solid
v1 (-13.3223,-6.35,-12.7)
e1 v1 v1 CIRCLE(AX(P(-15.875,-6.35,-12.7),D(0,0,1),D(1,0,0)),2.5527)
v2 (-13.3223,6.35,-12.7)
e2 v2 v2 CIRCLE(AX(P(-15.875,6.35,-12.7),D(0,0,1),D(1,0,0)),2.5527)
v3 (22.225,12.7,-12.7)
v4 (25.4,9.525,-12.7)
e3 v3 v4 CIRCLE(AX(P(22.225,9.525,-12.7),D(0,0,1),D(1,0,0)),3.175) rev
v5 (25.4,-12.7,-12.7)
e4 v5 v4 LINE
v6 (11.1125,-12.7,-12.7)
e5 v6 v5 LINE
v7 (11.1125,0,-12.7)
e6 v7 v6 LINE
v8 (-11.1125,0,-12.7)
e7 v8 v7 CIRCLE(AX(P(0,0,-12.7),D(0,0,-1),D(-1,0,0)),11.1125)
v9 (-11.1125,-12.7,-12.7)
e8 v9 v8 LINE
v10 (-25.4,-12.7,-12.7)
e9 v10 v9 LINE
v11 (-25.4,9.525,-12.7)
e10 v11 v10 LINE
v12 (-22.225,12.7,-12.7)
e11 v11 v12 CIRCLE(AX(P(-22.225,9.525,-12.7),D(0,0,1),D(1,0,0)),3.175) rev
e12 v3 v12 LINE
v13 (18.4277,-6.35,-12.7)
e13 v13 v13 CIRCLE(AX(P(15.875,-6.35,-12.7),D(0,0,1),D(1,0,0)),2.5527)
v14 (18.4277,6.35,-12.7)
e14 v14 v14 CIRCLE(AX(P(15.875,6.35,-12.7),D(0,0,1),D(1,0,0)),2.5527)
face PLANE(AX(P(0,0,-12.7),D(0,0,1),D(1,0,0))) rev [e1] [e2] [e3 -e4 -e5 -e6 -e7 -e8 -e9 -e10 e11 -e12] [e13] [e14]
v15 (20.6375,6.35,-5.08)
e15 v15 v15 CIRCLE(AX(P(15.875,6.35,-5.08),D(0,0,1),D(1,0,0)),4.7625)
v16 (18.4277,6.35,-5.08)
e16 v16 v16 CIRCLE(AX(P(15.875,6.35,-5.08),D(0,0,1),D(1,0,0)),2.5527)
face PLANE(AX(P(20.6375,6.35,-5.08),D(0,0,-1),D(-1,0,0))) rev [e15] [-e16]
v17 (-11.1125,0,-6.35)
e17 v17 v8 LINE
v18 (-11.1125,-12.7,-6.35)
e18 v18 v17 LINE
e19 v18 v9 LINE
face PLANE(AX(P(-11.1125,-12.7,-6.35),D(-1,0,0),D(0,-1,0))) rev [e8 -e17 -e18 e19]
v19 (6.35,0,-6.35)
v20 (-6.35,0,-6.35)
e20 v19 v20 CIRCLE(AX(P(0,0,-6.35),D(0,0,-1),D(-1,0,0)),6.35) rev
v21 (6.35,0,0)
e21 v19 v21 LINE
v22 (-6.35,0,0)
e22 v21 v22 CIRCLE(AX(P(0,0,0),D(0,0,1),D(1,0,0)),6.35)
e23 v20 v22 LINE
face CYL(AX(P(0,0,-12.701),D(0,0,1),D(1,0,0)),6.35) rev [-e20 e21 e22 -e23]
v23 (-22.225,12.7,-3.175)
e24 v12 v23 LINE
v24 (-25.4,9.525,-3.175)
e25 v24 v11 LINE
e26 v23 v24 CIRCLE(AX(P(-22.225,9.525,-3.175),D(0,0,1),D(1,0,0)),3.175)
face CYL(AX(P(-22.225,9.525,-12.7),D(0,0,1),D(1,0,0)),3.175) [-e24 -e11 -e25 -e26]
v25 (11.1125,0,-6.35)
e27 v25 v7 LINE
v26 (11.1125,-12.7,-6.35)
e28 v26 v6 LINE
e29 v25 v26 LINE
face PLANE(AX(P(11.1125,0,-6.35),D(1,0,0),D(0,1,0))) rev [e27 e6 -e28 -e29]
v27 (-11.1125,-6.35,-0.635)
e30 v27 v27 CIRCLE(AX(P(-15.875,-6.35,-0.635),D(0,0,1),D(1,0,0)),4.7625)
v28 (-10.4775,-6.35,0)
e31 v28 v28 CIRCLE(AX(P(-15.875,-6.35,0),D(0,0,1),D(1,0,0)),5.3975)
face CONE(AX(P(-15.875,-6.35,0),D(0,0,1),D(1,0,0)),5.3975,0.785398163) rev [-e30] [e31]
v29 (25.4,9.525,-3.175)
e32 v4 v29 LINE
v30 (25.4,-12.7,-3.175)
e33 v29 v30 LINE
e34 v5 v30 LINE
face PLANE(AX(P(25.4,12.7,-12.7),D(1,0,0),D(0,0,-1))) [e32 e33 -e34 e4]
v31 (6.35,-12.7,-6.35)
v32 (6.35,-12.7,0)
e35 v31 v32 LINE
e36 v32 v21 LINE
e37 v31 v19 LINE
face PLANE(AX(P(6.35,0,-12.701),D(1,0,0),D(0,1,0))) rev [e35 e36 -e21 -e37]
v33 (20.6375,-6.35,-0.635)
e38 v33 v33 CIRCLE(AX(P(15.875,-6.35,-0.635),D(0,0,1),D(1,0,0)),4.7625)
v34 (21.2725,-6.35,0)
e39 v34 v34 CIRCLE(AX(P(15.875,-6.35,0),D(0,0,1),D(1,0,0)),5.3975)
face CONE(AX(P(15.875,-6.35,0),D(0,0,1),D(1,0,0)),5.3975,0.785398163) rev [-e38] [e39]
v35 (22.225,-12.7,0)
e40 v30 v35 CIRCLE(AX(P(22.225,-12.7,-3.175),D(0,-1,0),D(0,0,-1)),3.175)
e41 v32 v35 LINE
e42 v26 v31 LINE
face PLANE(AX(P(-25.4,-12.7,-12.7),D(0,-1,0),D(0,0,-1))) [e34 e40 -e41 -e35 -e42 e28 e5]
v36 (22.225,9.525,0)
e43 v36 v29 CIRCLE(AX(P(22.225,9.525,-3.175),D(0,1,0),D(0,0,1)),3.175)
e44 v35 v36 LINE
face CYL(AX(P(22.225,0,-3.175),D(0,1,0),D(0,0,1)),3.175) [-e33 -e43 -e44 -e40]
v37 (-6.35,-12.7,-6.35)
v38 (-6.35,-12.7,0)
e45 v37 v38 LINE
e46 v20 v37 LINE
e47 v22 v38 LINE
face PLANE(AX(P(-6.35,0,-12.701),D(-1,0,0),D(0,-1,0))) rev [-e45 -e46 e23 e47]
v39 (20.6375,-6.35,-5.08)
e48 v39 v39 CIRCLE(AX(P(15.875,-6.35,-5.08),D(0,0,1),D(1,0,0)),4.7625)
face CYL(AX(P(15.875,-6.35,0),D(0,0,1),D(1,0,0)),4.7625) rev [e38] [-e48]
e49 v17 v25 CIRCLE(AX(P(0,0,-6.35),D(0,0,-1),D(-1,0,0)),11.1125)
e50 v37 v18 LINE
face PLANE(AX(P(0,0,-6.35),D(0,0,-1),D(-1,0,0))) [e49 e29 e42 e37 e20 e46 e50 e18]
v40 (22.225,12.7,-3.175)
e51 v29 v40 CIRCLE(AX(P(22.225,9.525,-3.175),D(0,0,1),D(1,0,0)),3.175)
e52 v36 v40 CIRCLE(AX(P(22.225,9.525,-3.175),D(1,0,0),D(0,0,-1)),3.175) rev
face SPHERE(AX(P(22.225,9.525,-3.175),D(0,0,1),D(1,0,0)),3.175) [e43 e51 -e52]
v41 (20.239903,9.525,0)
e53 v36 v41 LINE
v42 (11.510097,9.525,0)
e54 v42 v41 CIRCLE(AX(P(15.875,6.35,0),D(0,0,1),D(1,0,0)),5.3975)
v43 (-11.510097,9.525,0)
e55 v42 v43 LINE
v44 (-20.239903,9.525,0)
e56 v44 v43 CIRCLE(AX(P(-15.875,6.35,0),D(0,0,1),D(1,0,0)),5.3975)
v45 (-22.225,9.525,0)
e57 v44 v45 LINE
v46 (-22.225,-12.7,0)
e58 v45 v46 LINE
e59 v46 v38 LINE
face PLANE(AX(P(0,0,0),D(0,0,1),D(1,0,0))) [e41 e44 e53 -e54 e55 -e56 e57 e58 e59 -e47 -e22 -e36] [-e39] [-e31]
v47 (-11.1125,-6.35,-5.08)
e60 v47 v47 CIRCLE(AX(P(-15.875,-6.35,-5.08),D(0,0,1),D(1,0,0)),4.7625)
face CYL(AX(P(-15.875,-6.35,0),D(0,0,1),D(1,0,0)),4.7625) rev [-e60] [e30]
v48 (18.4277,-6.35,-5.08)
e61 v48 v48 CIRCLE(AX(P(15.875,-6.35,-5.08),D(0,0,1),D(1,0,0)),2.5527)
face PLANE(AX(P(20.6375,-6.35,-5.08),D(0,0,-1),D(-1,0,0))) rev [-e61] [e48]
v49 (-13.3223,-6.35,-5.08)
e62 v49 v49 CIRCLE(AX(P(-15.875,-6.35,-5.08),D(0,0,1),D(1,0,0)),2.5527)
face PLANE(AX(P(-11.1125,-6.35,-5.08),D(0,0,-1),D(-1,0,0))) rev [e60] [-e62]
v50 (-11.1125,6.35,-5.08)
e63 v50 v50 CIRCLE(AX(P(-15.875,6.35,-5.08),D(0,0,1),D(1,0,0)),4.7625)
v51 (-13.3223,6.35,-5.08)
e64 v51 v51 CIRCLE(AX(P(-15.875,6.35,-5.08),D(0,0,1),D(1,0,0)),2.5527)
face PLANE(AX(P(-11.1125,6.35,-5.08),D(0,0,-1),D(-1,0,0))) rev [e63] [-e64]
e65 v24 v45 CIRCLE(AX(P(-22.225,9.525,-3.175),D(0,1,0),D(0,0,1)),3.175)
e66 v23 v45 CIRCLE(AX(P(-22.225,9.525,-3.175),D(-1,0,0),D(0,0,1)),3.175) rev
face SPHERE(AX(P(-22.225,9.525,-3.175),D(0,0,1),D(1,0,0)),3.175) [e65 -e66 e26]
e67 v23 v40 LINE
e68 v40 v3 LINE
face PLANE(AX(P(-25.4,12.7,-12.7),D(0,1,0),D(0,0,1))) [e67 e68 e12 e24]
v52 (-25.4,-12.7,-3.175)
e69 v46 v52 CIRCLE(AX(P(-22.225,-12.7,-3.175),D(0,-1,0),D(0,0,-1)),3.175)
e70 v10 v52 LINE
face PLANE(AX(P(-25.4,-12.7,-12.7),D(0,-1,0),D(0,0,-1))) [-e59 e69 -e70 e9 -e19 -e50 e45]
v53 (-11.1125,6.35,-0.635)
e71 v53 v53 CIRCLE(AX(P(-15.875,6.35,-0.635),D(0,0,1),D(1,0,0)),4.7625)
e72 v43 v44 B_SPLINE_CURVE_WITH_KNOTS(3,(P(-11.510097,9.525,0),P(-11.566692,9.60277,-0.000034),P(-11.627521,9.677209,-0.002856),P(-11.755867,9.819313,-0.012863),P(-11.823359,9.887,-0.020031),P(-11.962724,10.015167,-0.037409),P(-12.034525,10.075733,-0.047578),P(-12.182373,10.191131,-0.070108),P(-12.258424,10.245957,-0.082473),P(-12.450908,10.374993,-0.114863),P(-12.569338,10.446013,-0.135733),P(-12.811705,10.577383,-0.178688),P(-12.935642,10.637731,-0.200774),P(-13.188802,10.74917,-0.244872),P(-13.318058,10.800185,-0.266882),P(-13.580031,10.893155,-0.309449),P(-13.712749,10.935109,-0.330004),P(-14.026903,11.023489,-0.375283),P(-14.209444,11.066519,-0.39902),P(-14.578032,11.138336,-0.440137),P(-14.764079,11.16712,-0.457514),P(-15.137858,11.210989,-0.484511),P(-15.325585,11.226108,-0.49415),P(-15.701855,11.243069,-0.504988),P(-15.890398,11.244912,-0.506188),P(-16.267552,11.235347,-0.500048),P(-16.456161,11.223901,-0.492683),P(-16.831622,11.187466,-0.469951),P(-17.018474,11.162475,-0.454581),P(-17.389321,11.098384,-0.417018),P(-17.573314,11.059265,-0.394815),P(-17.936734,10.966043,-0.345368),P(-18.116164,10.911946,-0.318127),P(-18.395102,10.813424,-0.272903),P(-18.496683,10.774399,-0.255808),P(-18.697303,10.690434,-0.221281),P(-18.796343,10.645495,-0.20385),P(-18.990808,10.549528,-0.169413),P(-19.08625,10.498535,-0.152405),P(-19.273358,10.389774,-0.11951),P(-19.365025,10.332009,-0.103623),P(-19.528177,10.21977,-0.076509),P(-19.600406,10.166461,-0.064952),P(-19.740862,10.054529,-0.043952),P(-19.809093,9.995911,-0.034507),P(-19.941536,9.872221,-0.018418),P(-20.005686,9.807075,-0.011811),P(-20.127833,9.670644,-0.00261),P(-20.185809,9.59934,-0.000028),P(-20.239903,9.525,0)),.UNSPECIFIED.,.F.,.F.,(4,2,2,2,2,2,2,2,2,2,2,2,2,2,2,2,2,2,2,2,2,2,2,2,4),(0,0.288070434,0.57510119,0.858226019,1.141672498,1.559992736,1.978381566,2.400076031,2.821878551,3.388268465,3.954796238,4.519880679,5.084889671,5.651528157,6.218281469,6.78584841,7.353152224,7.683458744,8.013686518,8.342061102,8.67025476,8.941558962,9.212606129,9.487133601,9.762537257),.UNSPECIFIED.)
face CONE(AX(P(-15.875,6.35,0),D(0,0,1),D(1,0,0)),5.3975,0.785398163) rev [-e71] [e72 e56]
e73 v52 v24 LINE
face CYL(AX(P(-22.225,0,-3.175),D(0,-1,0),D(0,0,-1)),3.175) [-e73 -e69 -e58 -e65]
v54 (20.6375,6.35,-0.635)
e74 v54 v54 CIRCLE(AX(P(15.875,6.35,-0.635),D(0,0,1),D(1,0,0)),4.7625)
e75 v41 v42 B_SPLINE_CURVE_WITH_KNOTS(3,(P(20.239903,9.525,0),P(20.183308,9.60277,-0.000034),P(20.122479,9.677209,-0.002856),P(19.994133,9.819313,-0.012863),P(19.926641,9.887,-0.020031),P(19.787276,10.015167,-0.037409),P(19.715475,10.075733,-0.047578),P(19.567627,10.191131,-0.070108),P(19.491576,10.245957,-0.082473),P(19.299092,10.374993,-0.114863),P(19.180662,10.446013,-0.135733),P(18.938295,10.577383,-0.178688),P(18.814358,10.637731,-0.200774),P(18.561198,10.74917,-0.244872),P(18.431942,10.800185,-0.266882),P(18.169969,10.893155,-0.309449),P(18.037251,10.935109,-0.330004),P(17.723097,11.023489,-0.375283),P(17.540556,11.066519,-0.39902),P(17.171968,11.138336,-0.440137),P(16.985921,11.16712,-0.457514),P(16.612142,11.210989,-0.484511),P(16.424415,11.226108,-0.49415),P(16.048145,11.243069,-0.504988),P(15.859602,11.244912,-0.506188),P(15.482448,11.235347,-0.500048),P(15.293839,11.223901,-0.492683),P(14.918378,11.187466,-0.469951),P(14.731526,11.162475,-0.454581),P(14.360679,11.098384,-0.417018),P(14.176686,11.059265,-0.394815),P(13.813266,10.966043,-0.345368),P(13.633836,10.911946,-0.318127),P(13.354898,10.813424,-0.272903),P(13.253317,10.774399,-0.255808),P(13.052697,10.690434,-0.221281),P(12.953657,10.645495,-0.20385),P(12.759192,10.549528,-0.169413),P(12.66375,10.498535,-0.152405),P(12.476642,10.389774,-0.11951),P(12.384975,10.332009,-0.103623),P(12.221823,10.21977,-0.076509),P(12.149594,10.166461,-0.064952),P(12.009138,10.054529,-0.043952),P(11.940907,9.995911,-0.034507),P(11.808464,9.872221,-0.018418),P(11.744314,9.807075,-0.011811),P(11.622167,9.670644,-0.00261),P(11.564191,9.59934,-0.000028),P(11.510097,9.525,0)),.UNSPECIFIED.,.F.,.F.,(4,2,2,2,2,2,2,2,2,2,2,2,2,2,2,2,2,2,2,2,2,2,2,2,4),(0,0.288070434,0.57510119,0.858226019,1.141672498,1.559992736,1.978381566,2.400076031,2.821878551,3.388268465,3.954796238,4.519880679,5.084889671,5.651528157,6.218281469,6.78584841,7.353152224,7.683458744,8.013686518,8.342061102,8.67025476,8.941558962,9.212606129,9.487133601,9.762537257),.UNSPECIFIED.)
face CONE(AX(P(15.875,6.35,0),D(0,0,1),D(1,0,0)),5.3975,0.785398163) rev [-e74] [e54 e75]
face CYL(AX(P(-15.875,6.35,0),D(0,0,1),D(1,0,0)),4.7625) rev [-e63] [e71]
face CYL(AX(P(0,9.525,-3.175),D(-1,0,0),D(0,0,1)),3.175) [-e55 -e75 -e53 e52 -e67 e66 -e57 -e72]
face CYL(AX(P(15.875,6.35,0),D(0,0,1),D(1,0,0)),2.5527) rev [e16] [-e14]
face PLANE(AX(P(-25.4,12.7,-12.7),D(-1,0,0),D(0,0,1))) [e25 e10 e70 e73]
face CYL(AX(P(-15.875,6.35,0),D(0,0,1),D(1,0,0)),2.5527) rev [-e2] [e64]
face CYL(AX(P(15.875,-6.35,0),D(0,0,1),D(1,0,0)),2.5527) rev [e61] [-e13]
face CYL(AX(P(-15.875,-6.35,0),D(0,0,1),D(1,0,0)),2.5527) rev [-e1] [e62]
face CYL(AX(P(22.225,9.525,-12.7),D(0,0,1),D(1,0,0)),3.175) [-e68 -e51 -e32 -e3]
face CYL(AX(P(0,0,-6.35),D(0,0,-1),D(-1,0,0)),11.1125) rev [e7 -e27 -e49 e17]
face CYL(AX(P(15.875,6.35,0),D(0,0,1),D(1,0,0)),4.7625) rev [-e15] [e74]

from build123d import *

# Parameters (mm, degrees)
SKETCH1_W                                    = 50.8
SKETCH1_H                                    = 25.4
BOSS_EXTRUDE1_DEPTH                          = 12.7
CBORE_FOR_10_SOCKET_HEAD_CAP_SCREW1_AT_COUNT = 2
CBORE_FOR_10_SOCKET_HEAD_CAP_SCREW1_AT_PITCH = 31.75
CBORE_FOR_10_SOCKET_HEAD_CAP_SCREW1_2_COUNT  = 2
CBORE_FOR_10_SOCKET_HEAD_CAP_SCREW1_2_PITCH  = 34.195796525
CBORE_FOR_10_SOCKET_HEAD_CAP_SCREW1_3_COUNT  = 2
CBORE_FOR_10_SOCKET_HEAD_CAP_SCREW1_3_PITCH  = 12.7
CUT_EXTRUDE1_REACH                           = 33.109
CUT_EXTRUDE2_DEPTH                           = 6.35
FILLET1_R                                    = 3.175


with BuildPart() as part:
    # Sketch1 → Boss-Extrude1 (new body)
    with BuildSketch(Plane.XY):
        Rectangle(SKETCH1_W, SKETCH1_H)
    extrude(amount=-BOSS_EXTRUDE1_DEPTH)

    # Sketch2 → CBORE for #10 Socket Head Cap Screw1 (revolve, cut)
    with BuildSketch(Plane(origin=(-15.875, 6.35, 0), x_dir=(0, -1, 0), z_dir=(1, 0, 0))):
        Polygon((0, 0), (0, 12.7), (2.5527, 12.7), (2.5527, 5.08), (4.7625, 5.08), (4.7625, 0.635), (5.3975, 0), align=None)
    cbore_for_10_socket_head_cap_screw1 = revolve(axis=Axis((-15.875, 6.35, 6.35), (0, 0, -1)), mode=Mode.SUBTRACT)

    # CBORE for #10 Socket Head Cap Screw1 at: CBORE for #10 Socket Head Cap Screw1 ×2
    with Locations(*[(i * CBORE_FOR_10_SOCKET_HEAD_CAP_SCREW1_AT_PITCH, 0, 0) for i in range(1, CBORE_FOR_10_SOCKET_HEAD_CAP_SCREW1_AT_COUNT)]):
        add(cbore_for_10_socket_head_cap_screw1, mode=Mode.SUBTRACT)

    # CBORE for _10 Socket Head Cap Screw1 2: CBORE for #10 Socket Head Cap Screw1 ×2
    with Locations(*[Vector(0.9284766908852594, -0.37139067635410367, 0) * (i * CBORE_FOR_10_SOCKET_HEAD_CAP_SCREW1_2_PITCH) for i in range(1, CBORE_FOR_10_SOCKET_HEAD_CAP_SCREW1_2_COUNT)]):
        add(cbore_for_10_socket_head_cap_screw1, mode=Mode.SUBTRACT)

    # CBORE for _10 Socket Head Cap Screw1 3: CBORE for #10 Socket Head Cap Screw1 ×2
    with Locations(*[(0, -i * CBORE_FOR_10_SOCKET_HEAD_CAP_SCREW1_3_PITCH, 0) for i in range(1, CBORE_FOR_10_SOCKET_HEAD_CAP_SCREW1_3_COUNT)]):
        add(cbore_for_10_socket_head_cap_screw1, mode=Mode.SUBTRACT)

    # Sketch4 → Cut-Extrude1 (cut, up to next)
    with BuildSketch(Plane.XY, mode=Mode.PRIVATE) as cut_extrude1_sk1:
        with BuildLine():
            Line((-6.35, 0), (-6.35, -12.7))
            Line((-6.35, -12.7), (6.35, -12.7))
            Line((6.35, -12.7), (6.35, 0))
            ThreePointArc((6.35, 0), (0, 6.35), (-6.35, 0))
        make_face()
    cut_extrude1_tool1 = extrude(cut_extrude1_sk1.sketch, amount=-CUT_EXTRUDE1_REACH, mode=Mode.PRIVATE) & part.part
    add(cut_extrude1_tool1.solids().sort_by_distance((0, -3.799576, 0))[0], mode=Mode.SUBTRACT)

    # Sketch5 → Cut-Extrude2 (cut)
    with BuildSketch(Plane(origin=(0, 0, -12.7), x_dir=(-1, 0, 0), z_dir=(0, 0, -1))):
        with BuildLine():
            Line((-11.1125, 0), (-11.1125, -12.7))
            Line((-11.1125, -12.7), (11.1125, -12.7))
            Line((11.1125, -12.7), (11.1125, 0))
            ThreePointArc((11.1125, 0), (0, 11.1125), (-11.1125, 0))
        make_face()
    extrude(amount=-CUT_EXTRUDE2_DEPTH, mode=Mode.SUBTRACT)

    # Fillet1
    # the kernel refuses this fillet: 3.175 mm, written as the material it takes off along each edge
    with BuildSketch(Plane(origin=(-22.225, 9.525, -3.175), x_dir=(-1, 0, 0), z_dir=(0, 1, 0))) as fillet1_piece_1_section:
        Polygon((0, 0), (FILLET1_R, 0), (FILLET1_R, FILLET1_R), (0, FILLET1_R), align=None)
    fillet1_piece_1 = extrude(amount=FILLET1_R, mode=Mode.PRIVATE)
    fillet1_piece_1 = fillet1_piece_1 - Plane(origin=(-22.225, 9.525, -3.175), x_dir=(0.7071067811865475, 0, -0.7071067811865475), z_dir=(0, 1, 0)) * Sphere(FILLET1_R, mode=Mode.PRIVATE)
    add(fillet1_piece_1, mode=Mode.SUBTRACT)
    with BuildSketch(Plane(origin=(22.225, 9.525, -3.175), x_dir=(1, 0, 0), z_dir=(0, 1, 0))) as fillet1_piece_2_section:
        Polygon((0, 0), (FILLET1_R, 0), (FILLET1_R, -FILLET1_R), (0, -FILLET1_R), align=None)
    fillet1_piece_2 = extrude(amount=FILLET1_R, mode=Mode.PRIVATE)
    fillet1_piece_2 = fillet1_piece_2 - Plane(origin=(22.225, 9.525, -3.175), x_dir=(-0.7071067811865475, 0, -0.7071067811865475), z_dir=(0, 1, 0)) * Sphere(FILLET1_R, mode=Mode.PRIVATE)
    add(fillet1_piece_2, mode=Mode.SUBTRACT)
    with BuildSketch(Plane(origin=(-25.4, -20.6375, 0), x_dir=(0, 0, -1), z_dir=(0, 1, 0)), Plane(origin=(25.4, 9.525, 0), x_dir=(0, 0, -1), z_dir=(0, -1, 0))) as fillet1_piece_3:
        with BuildLine():
            CenterArc((FILLET1_R, -FILLET1_R), FILLET1_R, 90, 90)
            Line((0, -FILLET1_R), (0, 0))
            Line((0, 0), (FILLET1_R, 0))
        make_face()
    extrude(amount=30.1625, mode=Mode.SUBTRACT)
    with BuildSketch(Plane(origin=(-22.225, 12.7, 0), x_dir=(0, 0, -1), z_dir=(1, 0, 0))) as fillet1_piece_4:
        with BuildLine():
            CenterArc((FILLET1_R, -FILLET1_R), FILLET1_R, 90, 90)
            Line((0, -FILLET1_R), (0, 0))
            Line((0, 0), (FILLET1_R, 0))
        make_face()
    extrude(amount=44.45, mode=Mode.SUBTRACT)
    with BuildSketch(Plane(origin=(-25.4, 12.7, -3.175), x_dir=(1, 0, 0), z_dir=(0, 0, -1))) as fillet1_piece_5:
        with BuildLine():
            CenterArc((FILLET1_R, FILLET1_R), FILLET1_R, 180, 90)
            Line((0, FILLET1_R), (0, 0))
            Line((0, 0), (FILLET1_R, 0))
        make_face()
    extrude(amount=17.4625, mode=Mode.SUBTRACT)
    with BuildSketch(Plane(origin=(25.4, 12.7, -3.175), x_dir=(-1, 0, 0), z_dir=(0, 0, -1))) as fillet1_piece_6:
        with BuildLine():
            CenterArc((FILLET1_R, -FILLET1_R), FILLET1_R, 90, 90)
            Line((0, -FILLET1_R), (0, 0))
            Line((0, 0), (FILLET1_R, 0))
        make_face()
    extrude(amount=17.4625, mode=Mode.SUBTRACT)


solid = part.part
